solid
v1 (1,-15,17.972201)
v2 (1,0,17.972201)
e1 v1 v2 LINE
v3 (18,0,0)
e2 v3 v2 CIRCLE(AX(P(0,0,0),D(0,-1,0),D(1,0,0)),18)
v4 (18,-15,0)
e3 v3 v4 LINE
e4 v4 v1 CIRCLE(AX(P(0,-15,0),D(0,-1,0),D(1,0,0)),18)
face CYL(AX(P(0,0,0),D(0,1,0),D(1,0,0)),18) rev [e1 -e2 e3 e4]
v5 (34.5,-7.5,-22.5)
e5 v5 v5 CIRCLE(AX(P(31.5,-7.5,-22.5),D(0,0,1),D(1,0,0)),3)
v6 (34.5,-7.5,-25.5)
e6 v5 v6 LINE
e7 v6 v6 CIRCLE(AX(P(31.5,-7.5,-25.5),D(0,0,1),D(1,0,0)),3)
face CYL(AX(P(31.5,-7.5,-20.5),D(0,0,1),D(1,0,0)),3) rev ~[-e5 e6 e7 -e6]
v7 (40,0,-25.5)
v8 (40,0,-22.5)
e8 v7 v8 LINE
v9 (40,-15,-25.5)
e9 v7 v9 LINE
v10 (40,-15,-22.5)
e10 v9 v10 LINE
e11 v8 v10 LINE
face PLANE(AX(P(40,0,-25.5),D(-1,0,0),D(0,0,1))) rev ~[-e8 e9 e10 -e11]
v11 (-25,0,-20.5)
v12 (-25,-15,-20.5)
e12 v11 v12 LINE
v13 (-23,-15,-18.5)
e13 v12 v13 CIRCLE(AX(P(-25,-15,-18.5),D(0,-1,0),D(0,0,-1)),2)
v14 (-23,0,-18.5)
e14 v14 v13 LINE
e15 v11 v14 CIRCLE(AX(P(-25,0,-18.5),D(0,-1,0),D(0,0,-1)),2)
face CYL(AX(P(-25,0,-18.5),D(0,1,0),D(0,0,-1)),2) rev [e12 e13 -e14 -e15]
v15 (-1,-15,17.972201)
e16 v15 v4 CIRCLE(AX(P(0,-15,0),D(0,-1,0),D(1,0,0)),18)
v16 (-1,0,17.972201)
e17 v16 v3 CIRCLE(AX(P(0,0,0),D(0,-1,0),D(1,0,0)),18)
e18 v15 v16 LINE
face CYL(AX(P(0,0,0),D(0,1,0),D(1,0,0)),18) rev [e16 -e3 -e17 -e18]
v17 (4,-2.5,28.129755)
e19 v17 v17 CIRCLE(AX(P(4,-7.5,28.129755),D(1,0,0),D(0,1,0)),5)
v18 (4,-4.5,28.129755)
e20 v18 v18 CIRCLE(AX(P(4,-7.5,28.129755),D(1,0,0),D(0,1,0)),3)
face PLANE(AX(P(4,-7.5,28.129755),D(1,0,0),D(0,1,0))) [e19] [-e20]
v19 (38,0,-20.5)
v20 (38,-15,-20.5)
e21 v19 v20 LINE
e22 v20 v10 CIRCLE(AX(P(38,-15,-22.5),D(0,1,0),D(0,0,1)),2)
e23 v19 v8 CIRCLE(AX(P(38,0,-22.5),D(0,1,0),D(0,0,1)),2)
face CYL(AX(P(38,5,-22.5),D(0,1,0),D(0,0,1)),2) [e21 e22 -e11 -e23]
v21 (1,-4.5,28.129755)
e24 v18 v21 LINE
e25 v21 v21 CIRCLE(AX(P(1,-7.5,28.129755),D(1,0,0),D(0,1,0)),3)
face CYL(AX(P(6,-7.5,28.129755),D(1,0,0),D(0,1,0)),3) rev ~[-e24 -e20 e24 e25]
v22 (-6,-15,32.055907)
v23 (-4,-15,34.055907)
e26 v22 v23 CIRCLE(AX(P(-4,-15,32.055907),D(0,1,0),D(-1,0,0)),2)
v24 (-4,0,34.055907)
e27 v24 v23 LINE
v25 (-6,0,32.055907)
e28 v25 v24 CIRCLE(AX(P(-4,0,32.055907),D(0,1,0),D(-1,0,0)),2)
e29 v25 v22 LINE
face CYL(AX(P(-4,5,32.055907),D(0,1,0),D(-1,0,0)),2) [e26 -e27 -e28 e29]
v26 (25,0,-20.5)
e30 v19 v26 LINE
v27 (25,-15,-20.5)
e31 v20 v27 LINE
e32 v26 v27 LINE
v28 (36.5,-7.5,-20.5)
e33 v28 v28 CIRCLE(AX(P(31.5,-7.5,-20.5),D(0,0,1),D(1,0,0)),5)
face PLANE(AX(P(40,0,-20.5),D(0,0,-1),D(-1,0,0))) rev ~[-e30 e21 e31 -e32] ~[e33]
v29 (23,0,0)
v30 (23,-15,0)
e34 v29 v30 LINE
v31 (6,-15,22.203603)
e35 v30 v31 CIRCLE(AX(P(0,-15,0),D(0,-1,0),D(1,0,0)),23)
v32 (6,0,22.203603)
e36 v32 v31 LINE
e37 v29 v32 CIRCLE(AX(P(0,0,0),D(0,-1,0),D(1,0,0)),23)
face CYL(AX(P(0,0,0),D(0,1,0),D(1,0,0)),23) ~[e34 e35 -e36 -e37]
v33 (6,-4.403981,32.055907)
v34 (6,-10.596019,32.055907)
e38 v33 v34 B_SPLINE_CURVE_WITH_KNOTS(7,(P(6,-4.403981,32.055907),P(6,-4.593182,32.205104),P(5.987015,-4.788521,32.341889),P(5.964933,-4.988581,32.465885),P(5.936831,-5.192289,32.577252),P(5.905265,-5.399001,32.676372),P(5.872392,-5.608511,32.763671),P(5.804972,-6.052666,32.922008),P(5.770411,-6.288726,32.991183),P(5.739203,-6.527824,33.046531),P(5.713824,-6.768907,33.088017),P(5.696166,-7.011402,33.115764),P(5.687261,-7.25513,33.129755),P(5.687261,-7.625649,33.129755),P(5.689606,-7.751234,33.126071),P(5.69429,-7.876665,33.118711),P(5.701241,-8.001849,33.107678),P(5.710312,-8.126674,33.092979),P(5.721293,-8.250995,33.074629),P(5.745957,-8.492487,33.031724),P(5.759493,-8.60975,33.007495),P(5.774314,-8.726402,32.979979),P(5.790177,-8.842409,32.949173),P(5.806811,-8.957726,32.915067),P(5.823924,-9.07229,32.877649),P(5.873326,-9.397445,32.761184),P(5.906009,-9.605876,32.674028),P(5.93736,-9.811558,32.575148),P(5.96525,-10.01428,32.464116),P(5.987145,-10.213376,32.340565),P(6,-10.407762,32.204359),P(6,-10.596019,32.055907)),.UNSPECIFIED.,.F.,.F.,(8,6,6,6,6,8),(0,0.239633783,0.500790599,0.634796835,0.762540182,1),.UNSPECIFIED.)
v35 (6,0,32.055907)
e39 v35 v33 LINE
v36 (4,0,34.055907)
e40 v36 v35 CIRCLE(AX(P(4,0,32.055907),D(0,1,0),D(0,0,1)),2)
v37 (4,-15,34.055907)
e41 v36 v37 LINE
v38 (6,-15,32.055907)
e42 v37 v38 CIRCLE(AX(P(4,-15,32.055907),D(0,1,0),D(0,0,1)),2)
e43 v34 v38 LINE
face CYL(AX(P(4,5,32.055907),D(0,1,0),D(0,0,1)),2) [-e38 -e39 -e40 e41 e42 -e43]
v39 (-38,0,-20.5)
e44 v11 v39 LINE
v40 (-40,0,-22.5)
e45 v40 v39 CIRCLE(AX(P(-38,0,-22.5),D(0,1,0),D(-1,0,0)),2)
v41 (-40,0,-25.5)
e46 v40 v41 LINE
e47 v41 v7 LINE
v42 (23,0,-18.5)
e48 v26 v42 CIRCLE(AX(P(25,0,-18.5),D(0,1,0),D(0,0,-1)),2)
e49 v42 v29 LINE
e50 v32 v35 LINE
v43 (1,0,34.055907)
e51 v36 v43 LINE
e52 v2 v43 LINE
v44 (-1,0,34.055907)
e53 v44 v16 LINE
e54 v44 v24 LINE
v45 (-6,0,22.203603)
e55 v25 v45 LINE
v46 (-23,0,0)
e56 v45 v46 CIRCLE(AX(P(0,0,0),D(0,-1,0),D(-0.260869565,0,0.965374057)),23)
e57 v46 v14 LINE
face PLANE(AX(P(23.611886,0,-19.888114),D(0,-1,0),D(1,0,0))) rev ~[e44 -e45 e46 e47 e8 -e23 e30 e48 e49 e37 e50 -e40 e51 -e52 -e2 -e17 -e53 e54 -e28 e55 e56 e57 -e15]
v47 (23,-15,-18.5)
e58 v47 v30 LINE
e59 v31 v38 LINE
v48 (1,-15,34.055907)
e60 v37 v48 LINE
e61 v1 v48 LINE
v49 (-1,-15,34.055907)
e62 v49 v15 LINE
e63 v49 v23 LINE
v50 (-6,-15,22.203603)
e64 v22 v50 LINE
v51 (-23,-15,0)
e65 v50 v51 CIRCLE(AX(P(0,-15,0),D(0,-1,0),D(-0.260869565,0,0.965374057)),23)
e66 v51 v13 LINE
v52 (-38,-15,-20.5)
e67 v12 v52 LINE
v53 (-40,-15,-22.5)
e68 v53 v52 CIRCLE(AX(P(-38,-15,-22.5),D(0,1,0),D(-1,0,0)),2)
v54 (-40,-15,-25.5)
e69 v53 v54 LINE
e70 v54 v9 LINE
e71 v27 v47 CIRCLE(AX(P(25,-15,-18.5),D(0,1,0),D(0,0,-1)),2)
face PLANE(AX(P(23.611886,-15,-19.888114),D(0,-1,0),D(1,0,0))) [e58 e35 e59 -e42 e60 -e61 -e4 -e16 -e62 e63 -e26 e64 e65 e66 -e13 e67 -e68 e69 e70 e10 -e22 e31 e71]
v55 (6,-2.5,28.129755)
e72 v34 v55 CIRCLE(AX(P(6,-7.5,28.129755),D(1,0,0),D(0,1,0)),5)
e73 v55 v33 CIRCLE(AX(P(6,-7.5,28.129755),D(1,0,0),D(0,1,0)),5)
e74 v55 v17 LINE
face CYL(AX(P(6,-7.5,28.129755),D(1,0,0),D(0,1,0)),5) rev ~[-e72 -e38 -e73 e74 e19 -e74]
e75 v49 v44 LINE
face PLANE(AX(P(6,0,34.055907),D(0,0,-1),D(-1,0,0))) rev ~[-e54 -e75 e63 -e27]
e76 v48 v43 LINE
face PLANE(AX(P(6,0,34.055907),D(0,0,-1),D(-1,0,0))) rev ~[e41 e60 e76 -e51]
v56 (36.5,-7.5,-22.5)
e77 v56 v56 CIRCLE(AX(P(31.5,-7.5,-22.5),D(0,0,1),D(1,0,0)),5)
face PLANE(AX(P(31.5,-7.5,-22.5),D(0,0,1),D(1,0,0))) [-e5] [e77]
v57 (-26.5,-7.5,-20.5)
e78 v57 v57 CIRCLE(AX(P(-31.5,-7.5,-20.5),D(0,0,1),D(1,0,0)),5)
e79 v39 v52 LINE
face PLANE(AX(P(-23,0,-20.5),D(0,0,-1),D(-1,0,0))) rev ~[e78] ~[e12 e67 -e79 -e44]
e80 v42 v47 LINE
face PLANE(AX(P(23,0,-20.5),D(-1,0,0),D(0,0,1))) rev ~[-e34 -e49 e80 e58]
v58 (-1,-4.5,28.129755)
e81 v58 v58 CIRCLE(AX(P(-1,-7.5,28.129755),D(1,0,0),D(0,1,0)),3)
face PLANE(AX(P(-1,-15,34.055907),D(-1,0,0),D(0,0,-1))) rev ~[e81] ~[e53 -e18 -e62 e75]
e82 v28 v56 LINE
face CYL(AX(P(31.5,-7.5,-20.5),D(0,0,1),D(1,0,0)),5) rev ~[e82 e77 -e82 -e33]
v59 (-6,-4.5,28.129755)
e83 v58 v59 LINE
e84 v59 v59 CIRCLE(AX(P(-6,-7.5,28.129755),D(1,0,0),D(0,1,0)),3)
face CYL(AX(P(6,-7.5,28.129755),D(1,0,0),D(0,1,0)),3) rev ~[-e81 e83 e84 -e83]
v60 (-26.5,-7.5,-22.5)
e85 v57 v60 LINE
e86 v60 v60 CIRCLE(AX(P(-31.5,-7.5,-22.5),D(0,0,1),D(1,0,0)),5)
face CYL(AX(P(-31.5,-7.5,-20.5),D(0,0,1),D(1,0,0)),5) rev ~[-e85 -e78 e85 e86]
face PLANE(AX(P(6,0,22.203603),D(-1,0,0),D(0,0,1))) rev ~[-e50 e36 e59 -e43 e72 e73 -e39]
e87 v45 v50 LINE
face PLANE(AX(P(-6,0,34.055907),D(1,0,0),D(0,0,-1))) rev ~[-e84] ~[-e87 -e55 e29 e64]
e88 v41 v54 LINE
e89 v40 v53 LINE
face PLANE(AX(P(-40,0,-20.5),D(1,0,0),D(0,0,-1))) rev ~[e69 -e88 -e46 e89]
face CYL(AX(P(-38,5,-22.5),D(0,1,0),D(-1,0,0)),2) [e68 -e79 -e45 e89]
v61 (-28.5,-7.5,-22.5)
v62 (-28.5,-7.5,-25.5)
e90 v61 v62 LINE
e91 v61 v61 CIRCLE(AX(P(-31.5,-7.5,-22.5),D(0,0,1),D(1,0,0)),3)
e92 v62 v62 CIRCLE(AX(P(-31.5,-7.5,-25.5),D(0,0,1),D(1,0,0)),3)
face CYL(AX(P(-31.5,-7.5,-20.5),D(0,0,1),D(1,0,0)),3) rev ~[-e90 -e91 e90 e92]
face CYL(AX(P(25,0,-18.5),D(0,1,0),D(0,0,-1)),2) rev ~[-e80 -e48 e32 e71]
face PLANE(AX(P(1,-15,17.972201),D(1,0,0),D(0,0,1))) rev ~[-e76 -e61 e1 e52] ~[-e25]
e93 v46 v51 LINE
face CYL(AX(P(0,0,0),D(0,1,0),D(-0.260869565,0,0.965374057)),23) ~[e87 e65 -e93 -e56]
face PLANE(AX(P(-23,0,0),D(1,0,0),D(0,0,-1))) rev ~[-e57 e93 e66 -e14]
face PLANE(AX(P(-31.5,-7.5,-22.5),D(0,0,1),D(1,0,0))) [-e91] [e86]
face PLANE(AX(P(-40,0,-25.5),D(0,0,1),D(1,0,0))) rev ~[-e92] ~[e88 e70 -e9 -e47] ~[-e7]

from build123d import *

# Parameters (mm, degrees)
F0_R         = 18
F1_DEPTH     = 15
F3_DEPTH     = 25
F4_R         = 3
F5_DEPTH     = 25
F4_R_2       = 5
F6_DEPTH     = 2
F7_R         = 3
F8_DEPTH     = 25
F7_R_2       = 5
F9_DEPTH     = 2
F10_R        = 3
F11_DEPTH    = 25
F10_R_2      = 5
F12_DEPTH    = 2
F13_T1_DEPTH = 15
F13_T3_DEPTH = 25


# Not quite as in the source:
# - a fillet or chamfer that OpenCascade refuses, or shapes differently, is made with other operations: its cross-section is extruded or revolved along the edge and cut away or added


with BuildPart() as f1:
    # F0 (on Front) → F1 (new body)
    with BuildSketch(Plane.XZ):
        with BuildLine():
            Line((23, -20.5), (10.4283268073, -20.5))
            ThreePointArc((10.4283268073, -20.5), (0, -23), (-10.4283268073, -20.5))
            Line((-10.4283268073, -20.5), (-23, -20.5))
            Line((-23, -20.5), (-40, -20.5))
            Line((-40, -20.5), (-40, -25.5))
            Line((-40, -25.5), (40, -25.5))
            Line((40, -25.5), (40, -20.5))
            Line((40, -20.5), (23, -20.5))
        make_face()
        with BuildLine():
            Line((-23, -20.5), (-10.4283268073, -20.5))
            ThreePointArc((-10.4283268073, -20.5), (-19.606778376, -12.0239029319), (-23, 0))
            Line((-23, 0), (-23, -20.5))
        make_face()
        with BuildLine():
            ThreePointArc((10.4283268073, -20.5), (19.606778376, -12.0239029319), (23, 0))
            ThreePointArc((23, 0), (18.2619823677, 13.9821314541), (6, 22.2036033112))
            Line((6, 22.2036033112), (6, 19.0559069812))
            Line((6, 19.0559069812), (-6, 19.0559069812))
            Line((-6, 19.0559069812), (-6, 22.2036033112))
            ThreePointArc((-6, 22.2036033112), (-18.2619823677, 13.9821314541), (-23, 0))
            ThreePointArc((-23, 0), (-19.606778376, -12.0239029319), (-10.4283268073, -20.5))
            Line((-10.4283268073, -20.5), (10.4283268073, -20.5))
        make_face()
        Circle(F0_R, mode=Mode.SUBTRACT)
        with BuildLine():
            Line((23, -20.5), (23, 0))
            ThreePointArc((23, 0), (19.606778376, -12.0239029319), (10.4283268073, -20.5))
            Line((10.4283268073, -20.5), (23, -20.5))
        make_face()
        with BuildLine():
            ThreePointArc((-10.4283268073, -20.5), (0, -23), (10.4283268073, -20.5))
            Line((10.4283268073, -20.5), (-10.4283268073, -20.5))
        make_face()
        with BuildLine():
            ThreePointArc((-6, 22.2036033112), (0, 23), (6, 22.2036033112))
            Line((6, 22.2036033112), (6, 34.0559069812))
            Line((6, 34.0559069812), (-6, 34.0559069812))
            Line((-6, 34.0559069812), (-6, 22.2036033112))
        make_face()
        with BuildLine():
            Line((6, 19.0559069812), (6, 22.2036033112))
            ThreePointArc((6, 22.2036033112), (0, 23), (-6, 22.2036033112))
            Line((-6, 22.2036033112), (-6, 19.0559069812))
            Line((-6, 19.0559069812), (6, 19.0559069812))
        make_face()
    extrude(amount=F1_DEPTH)

    # F2 (on face) → F3 (cut)
    with BuildSketch(Plane.XZ.offset(15)):
        with BuildLine():
            Line((1, 34.0559069812), (-1, 34.0559069812))
            Line((-1, 34.0559069812), (-1, 17.9722007556))
            ThreePointArc((-1, 17.9722007556), (0, 18), (1, 17.9722007556))
            Line((1, 17.9722007556), (1, 34.0559069812))
        make_face()
    extrude(amount=-F3_DEPTH, mode=Mode.SUBTRACT)

    # F4 (on face) → F5 (cut)
    with BuildSketch(Plane.XY.offset(-20.5)):
        with Locations((31.5, -7.5)):
            Circle(F4_R)
    extrude(amount=-F5_DEPTH, mode=Mode.SUBTRACT)

    # F4 (on face) → F6 (cut)
    with BuildSketch(Plane.XY.offset(-20.5)):
        with Locations((31.5, -7.5)):
            Circle(F4_R_2)
        with Locations((31.5, -7.5)):
            Circle(F4_R, mode=Mode.SUBTRACT)
    extrude(amount=-F6_DEPTH, mode=Mode.SUBTRACT)

    # F7 (on face) → F8 (cut)
    with BuildSketch(Plane.XY.offset(-20.5)):
        with Locations((-31.5, -7.5)):
            Circle(F7_R)
    extrude(amount=-F8_DEPTH, mode=Mode.SUBTRACT)

    # F7 (on face) → F9 (cut)
    with BuildSketch(Plane.XY.offset(-20.5)):
        with Locations((-31.5, -7.5)):
            Circle(F7_R_2)
        with Locations((-31.5, -7.5)):
            Circle(F7_R, mode=Mode.SUBTRACT)
    extrude(amount=-F9_DEPTH, mode=Mode.SUBTRACT)

    # F10 (on face) → F11 (cut)
    with BuildSketch(Plane.YZ.offset(6)):
        with Locations((-7.5, 28.1297551462)):
            Circle(F10_R)
    extrude(amount=-F11_DEPTH, mode=Mode.SUBTRACT)

    # F10 (on face) → F12 (cut)
    with BuildSketch(Plane.YZ.offset(6)):
        with Locations((-7.5, 28.1297551462)):
            Circle(F10_R_2)
        with Locations((-7.5, 28.1297551462)):
            Circle(F10_R, mode=Mode.SUBTRACT)
    extrude(amount=-F12_DEPTH, mode=Mode.SUBTRACT)

    # F13: fillet of radius 2 on 6 edges, made by hand

    # F13_s2 → F13_t1 (join)
    with BuildSketch(Plane.XZ):
        with BuildLine():
            ThreePointArc((25, -20.5), (23.5857864376, -19.9142135624), (23, -18.5))
            Line((23, -18.5), (23, -20.5))
            Line((23, -20.5), (25, -20.5))
        make_face()
        with BuildLine():
            ThreePointArc((-25, -20.5), (-23.5857864376, -19.9142135624), (-23, -18.5))
            Line((-23, -18.5), (-23, -20.5))
            Line((-23, -20.5), (-25, -20.5))
        make_face()
    extrude(amount=F13_T1_DEPTH)

    # F13_s4 → F13_t3 (cut)
    with BuildSketch(Plane.XZ.offset(-5)):
        with BuildLine():
            ThreePointArc((-6, 32.0559069812), (-5.4142135624, 33.4701205436), (-4, 34.0559069812))
            Line((-4, 34.0559069812), (-6, 34.0559069812))
            Line((-6, 34.0559069812), (-6, 32.0559069812))
        make_face()
        with BuildLine():
            ThreePointArc((4, 34.0559069812), (5.4142135624, 33.4701205436), (6, 32.0559069812))
            Line((6, 32.0559069812), (6, 34.0559069812))
            Line((6, 34.0559069812), (4, 34.0559069812))
        make_face()
        with BuildLine():
            ThreePointArc((38, -20.5), (39.4142135624, -21.0857864376), (40, -22.5))
            Line((40, -22.5), (40, -20.5))
            Line((40, -20.5), (38, -20.5))
        make_face()
        with BuildLine():
            ThreePointArc((-40, -22.5), (-39.4142135624, -21.0857864376), (-38, -20.5))
            Line((-38, -20.5), (-40, -20.5))
            Line((-40, -20.5), (-40, -22.5))
        make_face()
    extrude(amount=F13_T3_DEPTH, mode=Mode.SUBTRACT)


solid = f1.part
